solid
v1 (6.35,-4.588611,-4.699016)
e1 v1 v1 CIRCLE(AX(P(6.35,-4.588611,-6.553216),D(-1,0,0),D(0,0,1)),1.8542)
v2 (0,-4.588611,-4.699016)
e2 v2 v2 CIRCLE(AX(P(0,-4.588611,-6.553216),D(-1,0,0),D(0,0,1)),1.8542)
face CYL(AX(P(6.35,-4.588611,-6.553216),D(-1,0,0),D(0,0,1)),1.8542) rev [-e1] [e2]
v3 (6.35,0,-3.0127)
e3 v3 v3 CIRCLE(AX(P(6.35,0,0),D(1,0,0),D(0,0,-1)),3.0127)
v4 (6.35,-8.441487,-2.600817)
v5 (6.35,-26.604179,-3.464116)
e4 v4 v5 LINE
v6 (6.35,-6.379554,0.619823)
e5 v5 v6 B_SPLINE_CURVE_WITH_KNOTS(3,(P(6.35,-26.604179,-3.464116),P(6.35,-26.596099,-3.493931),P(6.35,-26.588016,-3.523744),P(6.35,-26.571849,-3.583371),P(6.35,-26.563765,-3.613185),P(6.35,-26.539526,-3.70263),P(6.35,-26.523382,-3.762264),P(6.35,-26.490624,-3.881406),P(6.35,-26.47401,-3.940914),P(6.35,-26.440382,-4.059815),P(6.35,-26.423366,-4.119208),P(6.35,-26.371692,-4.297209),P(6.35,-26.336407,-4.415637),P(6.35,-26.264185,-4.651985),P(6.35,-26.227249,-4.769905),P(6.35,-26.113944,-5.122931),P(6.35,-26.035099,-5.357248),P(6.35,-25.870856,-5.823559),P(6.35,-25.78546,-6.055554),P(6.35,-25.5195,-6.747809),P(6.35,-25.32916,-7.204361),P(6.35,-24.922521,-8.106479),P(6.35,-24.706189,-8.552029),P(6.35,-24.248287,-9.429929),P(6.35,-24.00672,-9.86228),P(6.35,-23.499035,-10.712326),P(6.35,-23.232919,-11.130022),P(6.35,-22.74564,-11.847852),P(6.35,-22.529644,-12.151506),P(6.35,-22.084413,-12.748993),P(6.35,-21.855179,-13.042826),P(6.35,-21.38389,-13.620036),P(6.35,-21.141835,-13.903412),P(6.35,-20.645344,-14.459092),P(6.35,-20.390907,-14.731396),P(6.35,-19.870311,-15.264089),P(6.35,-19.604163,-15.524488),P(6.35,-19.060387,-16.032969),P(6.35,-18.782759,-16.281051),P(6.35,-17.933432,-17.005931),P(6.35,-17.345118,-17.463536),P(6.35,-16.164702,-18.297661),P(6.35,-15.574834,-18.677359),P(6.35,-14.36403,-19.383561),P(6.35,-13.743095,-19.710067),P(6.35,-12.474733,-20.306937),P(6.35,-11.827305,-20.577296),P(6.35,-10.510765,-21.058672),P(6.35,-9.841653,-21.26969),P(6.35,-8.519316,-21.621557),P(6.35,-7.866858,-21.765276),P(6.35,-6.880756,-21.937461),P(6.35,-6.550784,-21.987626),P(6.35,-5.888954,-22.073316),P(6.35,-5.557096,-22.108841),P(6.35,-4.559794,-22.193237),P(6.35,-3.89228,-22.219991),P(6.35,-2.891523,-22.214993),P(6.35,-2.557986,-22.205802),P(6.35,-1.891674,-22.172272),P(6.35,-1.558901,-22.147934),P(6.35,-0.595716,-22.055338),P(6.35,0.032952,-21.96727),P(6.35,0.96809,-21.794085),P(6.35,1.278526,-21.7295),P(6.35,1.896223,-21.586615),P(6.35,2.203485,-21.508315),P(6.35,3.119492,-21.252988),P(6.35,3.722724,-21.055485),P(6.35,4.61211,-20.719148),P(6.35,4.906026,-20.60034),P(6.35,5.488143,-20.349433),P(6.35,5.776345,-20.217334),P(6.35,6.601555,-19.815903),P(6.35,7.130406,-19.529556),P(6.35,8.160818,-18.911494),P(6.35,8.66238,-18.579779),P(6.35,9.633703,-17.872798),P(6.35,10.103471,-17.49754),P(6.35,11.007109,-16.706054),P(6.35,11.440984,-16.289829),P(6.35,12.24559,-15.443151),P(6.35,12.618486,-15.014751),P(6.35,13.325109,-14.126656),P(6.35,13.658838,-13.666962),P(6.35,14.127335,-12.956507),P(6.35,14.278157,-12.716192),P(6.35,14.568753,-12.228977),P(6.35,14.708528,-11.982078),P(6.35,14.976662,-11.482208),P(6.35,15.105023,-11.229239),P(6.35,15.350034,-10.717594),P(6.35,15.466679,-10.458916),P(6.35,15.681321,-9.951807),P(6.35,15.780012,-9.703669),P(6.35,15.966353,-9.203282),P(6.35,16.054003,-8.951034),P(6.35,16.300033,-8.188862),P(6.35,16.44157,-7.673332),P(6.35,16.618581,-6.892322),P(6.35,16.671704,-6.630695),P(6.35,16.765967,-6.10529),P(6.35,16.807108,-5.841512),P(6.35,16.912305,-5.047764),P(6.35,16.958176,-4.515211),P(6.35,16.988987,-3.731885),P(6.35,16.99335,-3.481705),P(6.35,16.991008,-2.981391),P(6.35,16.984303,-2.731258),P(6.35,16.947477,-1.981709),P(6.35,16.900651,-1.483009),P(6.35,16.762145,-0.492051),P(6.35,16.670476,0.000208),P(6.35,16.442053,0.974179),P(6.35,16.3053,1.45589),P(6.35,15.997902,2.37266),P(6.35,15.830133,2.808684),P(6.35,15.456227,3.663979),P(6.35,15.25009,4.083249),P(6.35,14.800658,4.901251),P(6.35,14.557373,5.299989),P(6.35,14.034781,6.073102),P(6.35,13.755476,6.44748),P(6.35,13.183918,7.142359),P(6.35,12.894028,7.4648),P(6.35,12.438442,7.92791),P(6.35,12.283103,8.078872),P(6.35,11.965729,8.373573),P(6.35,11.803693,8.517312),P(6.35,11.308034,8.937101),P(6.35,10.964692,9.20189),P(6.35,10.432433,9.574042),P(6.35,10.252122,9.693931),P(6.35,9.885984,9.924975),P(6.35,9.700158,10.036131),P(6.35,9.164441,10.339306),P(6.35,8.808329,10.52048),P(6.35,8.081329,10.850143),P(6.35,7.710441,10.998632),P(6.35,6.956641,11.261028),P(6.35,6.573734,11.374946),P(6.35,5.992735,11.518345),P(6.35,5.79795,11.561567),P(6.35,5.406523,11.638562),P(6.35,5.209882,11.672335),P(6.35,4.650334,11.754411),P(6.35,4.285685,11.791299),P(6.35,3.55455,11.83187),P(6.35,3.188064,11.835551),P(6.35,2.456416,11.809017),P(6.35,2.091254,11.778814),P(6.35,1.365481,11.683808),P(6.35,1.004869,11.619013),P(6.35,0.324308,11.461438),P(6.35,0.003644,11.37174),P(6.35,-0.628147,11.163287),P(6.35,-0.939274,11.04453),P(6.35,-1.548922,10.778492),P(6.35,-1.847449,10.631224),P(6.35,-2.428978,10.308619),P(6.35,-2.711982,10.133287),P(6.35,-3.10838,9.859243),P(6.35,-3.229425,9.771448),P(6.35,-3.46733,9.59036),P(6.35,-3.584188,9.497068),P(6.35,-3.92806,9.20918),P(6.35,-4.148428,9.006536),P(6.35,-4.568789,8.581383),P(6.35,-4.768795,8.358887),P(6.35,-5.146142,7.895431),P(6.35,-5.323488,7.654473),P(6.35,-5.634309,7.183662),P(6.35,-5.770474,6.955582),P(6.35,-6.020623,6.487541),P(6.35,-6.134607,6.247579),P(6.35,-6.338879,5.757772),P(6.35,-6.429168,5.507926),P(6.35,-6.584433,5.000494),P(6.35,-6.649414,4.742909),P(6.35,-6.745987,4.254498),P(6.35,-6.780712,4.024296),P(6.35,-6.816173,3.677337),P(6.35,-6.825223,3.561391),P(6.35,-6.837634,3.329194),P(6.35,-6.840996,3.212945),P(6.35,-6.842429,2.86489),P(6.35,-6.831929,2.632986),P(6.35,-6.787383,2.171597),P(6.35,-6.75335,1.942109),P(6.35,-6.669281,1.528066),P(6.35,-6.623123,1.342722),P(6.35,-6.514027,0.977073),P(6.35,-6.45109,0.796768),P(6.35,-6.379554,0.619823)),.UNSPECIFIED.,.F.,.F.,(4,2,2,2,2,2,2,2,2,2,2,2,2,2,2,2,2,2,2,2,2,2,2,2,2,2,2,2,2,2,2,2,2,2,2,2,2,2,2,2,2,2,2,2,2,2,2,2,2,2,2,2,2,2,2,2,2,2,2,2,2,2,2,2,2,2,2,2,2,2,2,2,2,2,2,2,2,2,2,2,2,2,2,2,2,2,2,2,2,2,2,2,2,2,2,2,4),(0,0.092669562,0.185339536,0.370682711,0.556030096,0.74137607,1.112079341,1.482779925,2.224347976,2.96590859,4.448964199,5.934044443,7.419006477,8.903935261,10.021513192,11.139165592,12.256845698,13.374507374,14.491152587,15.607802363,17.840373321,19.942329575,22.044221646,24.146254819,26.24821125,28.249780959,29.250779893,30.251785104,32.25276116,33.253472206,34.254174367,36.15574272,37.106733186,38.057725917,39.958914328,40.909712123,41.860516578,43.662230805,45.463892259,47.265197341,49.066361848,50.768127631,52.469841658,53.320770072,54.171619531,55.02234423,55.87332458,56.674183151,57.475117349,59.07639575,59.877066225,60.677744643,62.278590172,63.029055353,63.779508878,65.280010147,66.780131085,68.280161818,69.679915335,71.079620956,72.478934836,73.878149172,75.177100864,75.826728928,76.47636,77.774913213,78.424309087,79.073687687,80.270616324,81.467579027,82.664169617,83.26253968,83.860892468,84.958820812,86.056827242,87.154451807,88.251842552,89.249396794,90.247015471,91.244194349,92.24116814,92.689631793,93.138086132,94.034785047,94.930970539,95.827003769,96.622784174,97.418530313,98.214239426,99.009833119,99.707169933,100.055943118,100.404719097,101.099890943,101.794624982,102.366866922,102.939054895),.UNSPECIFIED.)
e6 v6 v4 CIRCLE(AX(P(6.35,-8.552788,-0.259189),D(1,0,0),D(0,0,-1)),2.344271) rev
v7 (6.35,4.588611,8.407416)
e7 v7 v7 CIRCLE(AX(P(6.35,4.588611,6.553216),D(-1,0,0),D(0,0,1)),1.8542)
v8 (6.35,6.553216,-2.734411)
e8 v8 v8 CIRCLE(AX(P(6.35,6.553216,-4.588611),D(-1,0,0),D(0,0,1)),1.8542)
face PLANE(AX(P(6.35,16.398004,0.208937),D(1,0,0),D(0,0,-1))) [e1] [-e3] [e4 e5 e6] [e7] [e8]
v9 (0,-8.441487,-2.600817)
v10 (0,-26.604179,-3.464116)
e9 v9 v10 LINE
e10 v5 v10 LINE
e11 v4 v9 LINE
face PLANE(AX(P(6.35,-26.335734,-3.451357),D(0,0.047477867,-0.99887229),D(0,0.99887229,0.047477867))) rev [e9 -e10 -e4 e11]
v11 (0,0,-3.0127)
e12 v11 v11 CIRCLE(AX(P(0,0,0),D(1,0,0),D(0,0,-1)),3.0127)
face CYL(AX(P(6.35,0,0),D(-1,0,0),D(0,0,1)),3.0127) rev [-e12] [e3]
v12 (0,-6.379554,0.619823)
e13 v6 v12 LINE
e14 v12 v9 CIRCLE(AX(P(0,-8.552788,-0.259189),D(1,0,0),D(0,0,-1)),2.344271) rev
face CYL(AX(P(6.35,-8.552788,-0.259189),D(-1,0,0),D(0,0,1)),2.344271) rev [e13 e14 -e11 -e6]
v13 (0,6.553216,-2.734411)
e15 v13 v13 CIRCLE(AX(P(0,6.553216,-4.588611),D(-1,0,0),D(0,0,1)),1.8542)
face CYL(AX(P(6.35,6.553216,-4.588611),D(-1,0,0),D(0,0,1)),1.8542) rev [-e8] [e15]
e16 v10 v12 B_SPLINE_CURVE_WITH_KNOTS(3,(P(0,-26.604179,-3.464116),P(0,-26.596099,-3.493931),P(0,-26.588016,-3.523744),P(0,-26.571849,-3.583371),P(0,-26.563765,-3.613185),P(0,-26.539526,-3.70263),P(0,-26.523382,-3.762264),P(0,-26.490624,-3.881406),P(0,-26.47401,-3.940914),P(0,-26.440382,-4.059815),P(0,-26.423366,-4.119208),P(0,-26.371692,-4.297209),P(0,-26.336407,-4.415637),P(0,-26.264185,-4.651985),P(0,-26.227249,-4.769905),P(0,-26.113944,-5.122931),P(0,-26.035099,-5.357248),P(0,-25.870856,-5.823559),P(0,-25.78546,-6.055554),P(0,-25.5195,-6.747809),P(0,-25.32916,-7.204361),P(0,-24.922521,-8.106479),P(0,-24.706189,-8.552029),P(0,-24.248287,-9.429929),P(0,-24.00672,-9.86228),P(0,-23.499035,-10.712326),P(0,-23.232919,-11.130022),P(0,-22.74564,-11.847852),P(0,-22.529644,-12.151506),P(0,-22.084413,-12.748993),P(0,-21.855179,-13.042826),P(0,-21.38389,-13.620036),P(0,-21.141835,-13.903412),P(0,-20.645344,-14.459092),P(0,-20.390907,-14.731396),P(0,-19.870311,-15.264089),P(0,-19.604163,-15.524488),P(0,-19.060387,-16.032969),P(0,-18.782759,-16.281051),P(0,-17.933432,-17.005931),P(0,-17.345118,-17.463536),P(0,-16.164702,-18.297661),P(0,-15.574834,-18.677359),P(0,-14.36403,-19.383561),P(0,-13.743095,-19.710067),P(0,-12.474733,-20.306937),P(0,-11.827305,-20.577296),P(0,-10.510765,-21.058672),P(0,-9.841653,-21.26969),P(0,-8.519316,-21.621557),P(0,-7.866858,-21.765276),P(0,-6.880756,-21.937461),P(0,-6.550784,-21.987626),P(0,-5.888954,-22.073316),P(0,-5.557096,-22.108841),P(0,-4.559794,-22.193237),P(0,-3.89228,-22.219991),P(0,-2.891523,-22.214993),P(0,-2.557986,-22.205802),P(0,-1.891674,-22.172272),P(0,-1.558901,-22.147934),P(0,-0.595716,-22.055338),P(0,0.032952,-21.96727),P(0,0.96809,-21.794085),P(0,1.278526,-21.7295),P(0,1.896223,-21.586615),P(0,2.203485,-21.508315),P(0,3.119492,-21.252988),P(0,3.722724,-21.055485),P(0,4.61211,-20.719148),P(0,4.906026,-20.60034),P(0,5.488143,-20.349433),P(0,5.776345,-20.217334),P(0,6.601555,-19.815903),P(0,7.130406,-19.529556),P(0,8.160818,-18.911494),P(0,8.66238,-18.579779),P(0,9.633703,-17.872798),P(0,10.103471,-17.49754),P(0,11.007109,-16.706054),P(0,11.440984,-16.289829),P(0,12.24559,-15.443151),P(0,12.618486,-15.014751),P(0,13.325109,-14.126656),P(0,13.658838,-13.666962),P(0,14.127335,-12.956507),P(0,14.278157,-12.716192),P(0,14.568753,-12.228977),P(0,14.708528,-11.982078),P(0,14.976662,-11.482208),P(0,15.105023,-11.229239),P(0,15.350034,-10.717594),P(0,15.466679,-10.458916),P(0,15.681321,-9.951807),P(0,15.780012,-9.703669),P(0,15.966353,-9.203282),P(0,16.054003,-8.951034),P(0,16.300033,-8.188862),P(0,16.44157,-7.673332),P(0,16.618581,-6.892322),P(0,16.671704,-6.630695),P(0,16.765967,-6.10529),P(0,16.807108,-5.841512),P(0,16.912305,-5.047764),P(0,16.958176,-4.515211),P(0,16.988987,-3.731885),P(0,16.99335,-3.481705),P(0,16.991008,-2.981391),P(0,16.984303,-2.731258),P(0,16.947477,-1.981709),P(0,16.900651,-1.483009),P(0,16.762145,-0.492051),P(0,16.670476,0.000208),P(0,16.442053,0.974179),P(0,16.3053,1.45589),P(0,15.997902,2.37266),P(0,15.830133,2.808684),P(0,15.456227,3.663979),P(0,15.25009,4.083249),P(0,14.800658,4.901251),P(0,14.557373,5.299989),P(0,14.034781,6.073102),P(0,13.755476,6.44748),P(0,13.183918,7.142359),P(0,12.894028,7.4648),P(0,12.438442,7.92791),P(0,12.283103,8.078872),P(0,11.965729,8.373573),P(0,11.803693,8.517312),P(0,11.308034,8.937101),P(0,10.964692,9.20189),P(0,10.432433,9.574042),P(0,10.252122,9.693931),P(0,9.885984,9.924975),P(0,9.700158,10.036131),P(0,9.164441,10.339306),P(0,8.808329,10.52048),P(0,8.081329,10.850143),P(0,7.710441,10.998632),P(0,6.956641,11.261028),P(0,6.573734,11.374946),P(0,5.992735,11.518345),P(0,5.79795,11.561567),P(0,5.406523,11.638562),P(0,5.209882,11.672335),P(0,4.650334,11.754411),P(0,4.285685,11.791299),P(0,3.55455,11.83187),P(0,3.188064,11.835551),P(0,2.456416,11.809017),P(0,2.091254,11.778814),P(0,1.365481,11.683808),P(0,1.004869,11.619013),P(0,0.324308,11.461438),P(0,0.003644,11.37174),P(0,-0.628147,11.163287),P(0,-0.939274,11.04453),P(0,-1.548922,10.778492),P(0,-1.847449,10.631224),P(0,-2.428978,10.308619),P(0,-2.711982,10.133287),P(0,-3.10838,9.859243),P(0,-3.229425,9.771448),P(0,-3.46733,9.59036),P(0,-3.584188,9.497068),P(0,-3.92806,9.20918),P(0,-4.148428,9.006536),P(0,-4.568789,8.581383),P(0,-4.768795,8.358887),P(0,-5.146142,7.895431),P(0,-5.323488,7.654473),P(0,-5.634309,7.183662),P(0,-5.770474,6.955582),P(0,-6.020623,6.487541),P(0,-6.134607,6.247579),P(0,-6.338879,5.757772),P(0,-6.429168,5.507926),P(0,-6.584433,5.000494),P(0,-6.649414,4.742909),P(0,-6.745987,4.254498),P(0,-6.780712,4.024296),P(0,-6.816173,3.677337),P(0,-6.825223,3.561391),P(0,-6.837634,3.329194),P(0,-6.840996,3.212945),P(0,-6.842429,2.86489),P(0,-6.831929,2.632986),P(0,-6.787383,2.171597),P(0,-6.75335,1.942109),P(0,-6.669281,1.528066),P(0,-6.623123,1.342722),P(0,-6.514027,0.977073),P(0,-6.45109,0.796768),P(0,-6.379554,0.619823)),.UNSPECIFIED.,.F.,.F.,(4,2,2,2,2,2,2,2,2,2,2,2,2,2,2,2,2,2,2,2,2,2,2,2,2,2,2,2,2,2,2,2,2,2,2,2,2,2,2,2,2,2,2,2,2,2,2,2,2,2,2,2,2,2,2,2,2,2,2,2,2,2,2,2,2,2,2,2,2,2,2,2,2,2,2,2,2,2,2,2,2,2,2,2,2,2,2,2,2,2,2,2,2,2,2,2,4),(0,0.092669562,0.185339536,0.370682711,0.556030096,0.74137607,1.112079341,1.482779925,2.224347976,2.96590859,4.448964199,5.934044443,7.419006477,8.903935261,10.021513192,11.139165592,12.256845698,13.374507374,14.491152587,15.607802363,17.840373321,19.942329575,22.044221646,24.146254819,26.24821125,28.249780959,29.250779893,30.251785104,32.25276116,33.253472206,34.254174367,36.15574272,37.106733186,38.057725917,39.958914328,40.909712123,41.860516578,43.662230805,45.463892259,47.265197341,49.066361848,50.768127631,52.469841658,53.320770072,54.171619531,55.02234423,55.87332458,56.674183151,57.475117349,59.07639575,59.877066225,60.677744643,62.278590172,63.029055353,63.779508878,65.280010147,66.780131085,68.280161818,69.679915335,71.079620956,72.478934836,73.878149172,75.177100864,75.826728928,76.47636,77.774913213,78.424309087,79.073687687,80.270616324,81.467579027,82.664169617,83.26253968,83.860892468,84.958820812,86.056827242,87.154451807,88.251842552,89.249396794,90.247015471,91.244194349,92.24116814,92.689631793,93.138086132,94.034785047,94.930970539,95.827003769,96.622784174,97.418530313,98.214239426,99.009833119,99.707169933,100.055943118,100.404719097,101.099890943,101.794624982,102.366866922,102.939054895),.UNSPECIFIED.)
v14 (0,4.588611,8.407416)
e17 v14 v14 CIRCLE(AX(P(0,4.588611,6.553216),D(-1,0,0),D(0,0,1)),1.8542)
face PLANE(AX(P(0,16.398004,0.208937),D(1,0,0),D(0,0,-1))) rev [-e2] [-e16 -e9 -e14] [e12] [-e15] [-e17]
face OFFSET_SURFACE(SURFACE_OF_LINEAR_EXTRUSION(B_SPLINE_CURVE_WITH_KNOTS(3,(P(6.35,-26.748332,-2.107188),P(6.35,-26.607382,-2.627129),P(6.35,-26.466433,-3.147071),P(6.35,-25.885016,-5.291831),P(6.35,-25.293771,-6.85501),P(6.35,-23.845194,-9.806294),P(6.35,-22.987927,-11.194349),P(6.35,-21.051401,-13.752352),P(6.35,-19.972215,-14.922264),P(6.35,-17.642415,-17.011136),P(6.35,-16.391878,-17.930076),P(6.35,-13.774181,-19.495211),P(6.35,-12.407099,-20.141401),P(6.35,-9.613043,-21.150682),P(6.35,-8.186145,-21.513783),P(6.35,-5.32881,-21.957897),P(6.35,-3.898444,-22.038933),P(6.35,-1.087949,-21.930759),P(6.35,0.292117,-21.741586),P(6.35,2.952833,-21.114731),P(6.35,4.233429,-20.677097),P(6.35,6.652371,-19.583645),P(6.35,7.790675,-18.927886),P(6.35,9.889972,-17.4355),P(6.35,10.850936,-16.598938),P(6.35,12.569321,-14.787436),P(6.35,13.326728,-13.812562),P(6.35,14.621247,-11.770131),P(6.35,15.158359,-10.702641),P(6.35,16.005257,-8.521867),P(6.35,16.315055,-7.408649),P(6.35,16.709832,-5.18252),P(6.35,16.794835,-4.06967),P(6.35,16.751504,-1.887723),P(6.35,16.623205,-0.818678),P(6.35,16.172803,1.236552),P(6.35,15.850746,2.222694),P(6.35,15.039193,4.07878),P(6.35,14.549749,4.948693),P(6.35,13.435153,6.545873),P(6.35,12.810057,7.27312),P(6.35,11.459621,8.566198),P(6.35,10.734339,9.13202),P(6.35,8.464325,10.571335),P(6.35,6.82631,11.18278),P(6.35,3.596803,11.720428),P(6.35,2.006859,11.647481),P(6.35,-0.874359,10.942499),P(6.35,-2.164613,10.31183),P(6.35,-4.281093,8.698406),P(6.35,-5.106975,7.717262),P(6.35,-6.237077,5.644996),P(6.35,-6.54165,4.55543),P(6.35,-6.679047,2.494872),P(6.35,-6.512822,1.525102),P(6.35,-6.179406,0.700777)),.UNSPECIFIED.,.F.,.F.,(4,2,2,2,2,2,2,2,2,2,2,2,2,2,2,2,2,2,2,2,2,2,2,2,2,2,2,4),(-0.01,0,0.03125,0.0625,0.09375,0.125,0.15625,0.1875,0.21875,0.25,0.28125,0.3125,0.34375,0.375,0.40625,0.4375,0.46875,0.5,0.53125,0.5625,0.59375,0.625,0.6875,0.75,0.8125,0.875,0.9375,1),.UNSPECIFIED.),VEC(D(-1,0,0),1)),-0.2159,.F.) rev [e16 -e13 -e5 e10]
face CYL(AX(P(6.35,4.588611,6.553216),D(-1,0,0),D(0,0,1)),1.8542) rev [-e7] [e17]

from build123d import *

# Parameters (mm, degrees)
SKETCH4_R           = 3.012699969
BOSS_EXTRUDE1_DEPTH = 6.35
MOVE_FACE1_DEPTH    = 6.35
SKETCH11_R          = 1.8542
CUT_EXTRUDE2_DEPTH  = 36.237722546


# Read off the part's stored shape, not the designer's step: Move Face1
with BuildPart() as part:
    # Sketch4 → Boss-Extrude1 (new body)
    with BuildSketch(Plane(origin=(0, 0, 0), x_dir=(0, 0, -1), z_dir=(1, 0, 0))):
        with BuildLine():
            Line((3.667013126, -26.3254835), (2.816473307, -8.431236894))
            ThreePointArc((2.816473307, -8.431236894), (1.639602622, -6.396649217), (-0.700777066, -6.179406175))
            add(Edge.make_bspline(
                [(-0.700777066, -6.179406175), (-1.525102008, -6.512822326), (-2.494871997, -6.679047096), (-4.555429578, -6.54165034), (-5.644996058, -6.237076936), (-7.717261628, -5.106975392), (-8.698405735, -4.281093265), (-10.311829803, -2.164612563), (-10.942499326, -0.874358563), (-11.647480976, 2.006859472), (-11.720427957, 3.596803483), (-11.182779689, 6.826310345), (-10.571334953, 8.46432492), (-9.132019695, 10.73433891), (-8.566197708, 11.459621106), (-7.273120414, 12.810057002), (-6.545872807, 13.435152517), (-4.948692799, 14.549748502), (-4.078780417, 15.039192621), (-2.22269385, 15.85074605), (-1.236551533, 16.172803424), (0.818678144, 16.623204755), (1.887722789, 16.751503646), (4.069669804, 16.79483508), (5.182520117, 16.709831654), (7.408648574, 16.315055224), (8.521867273, 16.00525724), (10.70264063, 15.158359498), (11.770130786, 14.621247223), (13.812561896, 13.326727542), (14.787435905, 12.56932106), (16.598938448, 10.850935673), (17.435500393, 9.889971566), (18.927885533, 7.790674993), (19.583645356, 6.652371052), (20.677096627, 4.233429246), (21.114730733, 2.952832896), (21.741586229, 0.292117033), (21.930758945, -1.087949282), (22.038932986, -3.898444365), (21.957896657, -5.328810088), (21.513783431, -8.186144708), (21.150681858, -9.613043017), (20.141400668, -12.407098951), (19.49521083, -13.774181132), (17.930076055, -16.391877744), (17.011136269, -17.642414844), (14.922264044, -19.972214517), (13.752352434, -21.051401006), (11.194349378, -22.98792657), (9.80629411, -23.845193985), (6.855009859, -25.29377098), (5.291831431, -25.88501641), (3.667013126, -26.3254835)],
                knots=[0, 0, 0, 0, 0.0625, 0.0625, 0.125, 0.125, 0.1875, 0.1875, 0.25, 0.25, 0.3125, 0.3125, 0.375, 0.375, 0.40625, 0.40625, 0.4375, 0.4375, 0.46875, 0.46875, 0.5, 0.5, 0.53125, 0.53125, 0.5625, 0.5625, 0.59375, 0.59375, 0.625, 0.625, 0.65625, 0.65625, 0.6875, 0.6875, 0.71875, 0.71875, 0.75, 0.75, 0.78125, 0.78125, 0.8125, 0.8125, 0.84375, 0.84375, 0.875, 0.875, 0.90625, 0.90625, 0.9375, 0.9375, 0.96875, 0.96875, 1, 1, 1, 1], degree=3))
        make_face()
        Circle(SKETCH4_R, mode=Mode.SUBTRACT)
    extrude(amount=BOSS_EXTRUDE1_DEPTH)

    # Move Face1 outline → Move Face1 (add)
    with BuildSketch(Plane.YZ):
        with BuildLine():
            Line((-8.441487365, -2.600816779), (-26.604178645, -3.464116168))
            add(Edge.make_bspline(
                [(-26.604178645, -3.464116168), (-26.599569003, -3.481120458), (-26.594959362, -3.498124748), (-26.59034972, -3.515129038), (-26.585740078, -3.532133328), (-26.581130437, -3.549137618), (-26.576520795, -3.566141908), (-26.571911153, -3.583146198), (-26.567301512, -3.600150488), (-26.56269187, -3.617154778), (-26.558082228, -3.634159068), (-26.553472587, -3.651163358), (-26.548862945, -3.668167648), (-26.544253303, -3.685171938), (-26.53927128, -3.703549889), (-26.538898899, -3.704923549), (-26.538526517, -3.70629721), (-26.538154136, -3.707670871), (-26.537781754, -3.709044531), (-26.537409373, -3.710418192), (-26.537036991, -3.711791852), (-26.53666461, -3.713165513), (-26.536292228, -3.714539173), (-26.535919847, -3.715912834), (-26.535547465, -3.717286495), (-26.535175084, -3.718660155), (-26.534802702, -3.720033816), (-26.53424413, -3.722094307), (-26.534059907, -3.722773916), (-26.533858021, -3.723518442), (-26.533727067, -3.724001851), (-26.533440048, -3.725060798), (-26.533340537, -3.725426825), (-26.533133021, -3.726192717), (-26.532893488, -3.727076218), (-26.532782162, -3.727485594), (-26.532537582, -3.728388165), (-26.532375797, -3.728983938), (-26.532180677, -3.729703197), (-26.531993743, -3.730392017), (-26.531617908, -3.731776793), (-26.531429971, -3.732469173), (-26.531242014, -3.733161545), (-26.531054038, -3.733853909), (-26.530866042, -3.734546265), (-26.530678027, -3.735238614), (-26.530489992, -3.735930954), (-26.530301938, -3.736623286), (-26.530113864, -3.73731561), (-26.529925771, -3.738007927), (-26.529737659, -3.738700235), (-26.529549527, -3.739392535), (-26.529361375, -3.740084828), (-26.528420519, -3.74354625), (-26.527667523, -3.74631526), (-26.526914215, -3.749084142), (-26.526160594, -3.751852897), (-26.525406663, -3.754621524), (-26.524652417, -3.757390023), (-26.523897864, -3.760158394), (-26.523142994, -3.762926638), (-26.522387816, -3.765694753), (-26.521632324, -3.768462741), (-26.520876522, -3.7712306), (-26.520120408, -3.773998332), (-26.519363982, -3.776765936), (-26.517093769, -3.785068362), (-26.515579047, -3.790602801), (-26.514063078, -3.796136728), (-26.512545864, -3.801670141), (-26.511027403, -3.807203041), (-26.509507697, -3.812735429), (-26.507986745, -3.818267302), (-26.506464548, -3.823798661), (-26.504941106, -3.829329506), (-26.503416418, -3.834859837), (-26.501890486, -3.840389653), (-26.500363309, -3.845918954), (-26.498834888, -3.85144774), (-26.494245891, -3.868032549), (-26.491181583, -3.879087027), (-26.488112299, -3.890139439), (-26.485038042, -3.901189785), (-26.481958812, -3.912238061), (-26.478874612, -3.923284266), (-26.475785441, -3.934328398), (-26.472691304, -3.945370453), (-26.4695922, -3.956410431), (-26.466488131, -3.967448328), (-26.463379099, -3.978484142), (-26.460265106, -3.989517871), (-26.457146153, -4.000549514), (-26.441526593, -4.055697279), (-26.428951609, -4.099782062), (-26.416297387, -4.143833272), (-26.403564026, -4.187850766), (-26.390751622, -4.2318344), (-26.377860278, -4.275784033), (-26.364890086, -4.31969952), (-26.351841151, -4.363580717), (-26.338713566, -4.407427483), (-26.325507433, -4.451239673), (-26.312222848, -4.495017144), (-26.298859911, -4.538759754), (-26.285418719, -4.582467358), (-26.217821979, -4.800829638), (-26.162494118, -4.974957082), (-26.105922065, -5.148512984), (-26.048112096, -5.321488181), (-25.989070491, -5.49387351), (-25.928803524, -5.665659807), (-25.867317478, -5.836837911), (-25.804618624, -6.007398657), (-25.740713246, -6.177332884), (-25.675607616, -6.346631428), (-25.609308015, -6.515285126), (-25.541820718, -6.683284815), (-25.473152005, -6.850621333), (-25.263620445, -7.350613883), (-25.119234857, -7.681244245), (-24.970181526, -8.009184855), (-24.816563128, -8.334008567), (-24.658405438, -8.656540908), (-24.495574442, -8.975326705), (-24.328540305, -9.291435032), (-24.157090549, -9.604622916), (-23.981161893, -9.914157206), (-23.801250109, -10.220890306), (-23.616969066, -10.524098117), (-23.428657045, -10.824036045), (-23.23626742, -11.120542818), (-22.843508974, -11.706612059), (-22.643142176, -11.996174333), (-22.438808393, -12.282198027), (-22.230723583, -12.56460565), (-22.018648797, -12.843459923), (-21.802917467, -13.118447754), (-21.583605212, -13.389644606), (-21.360601243, -13.657176078), (-21.134077845, -13.920797741), (-20.904199437, -14.180403567), (-20.670850853, -14.43621903), (-20.434249131, -14.687936687), (-20.194399706, -14.935644556), (-19.70838235, -15.42287054), (-19.462215458, -15.662397811), (-19.212931723, -15.897766285), (-18.960728671, -16.128991264), (-18.70539447, -16.355994955), (-18.447304202, -16.578625492), (-18.186499944, -16.796967202), (-17.922857209, -17.011060359), (-17.656599224, -17.220738444), (-17.387896766, -17.42596103), (-17.116588056, -17.626860373), (-16.842954408, -17.82323191), (-16.566974945, -18.015139117), (-16.010532784, -18.389907039), (-15.730066911, -18.572777232), (-15.447424653, -18.751061226), (-15.162746667, -18.924851219), (-14.875916093, -19.093949929), (-14.587276398, -19.258367365), (-14.296840097, -19.418183126), (-14.004513923, -19.573354608), (-13.710535007, -19.723805382), (-13.415054471, -19.869556513), (-13.117916757, -20.010637113), (-12.819417073, -20.146961011), (-12.519527346, -20.278558541), (-11.917189037, -20.532242336), (-11.614733643, -20.65433651), (-11.311086848, -20.771622769), (-11.006314451, -20.884236095), (-10.700430715, -20.991914806), (-10.39369458, -21.094796517), (-10.086097937, -21.192946197), (-9.777608438, -21.286263743), (-9.468444303, -21.374756831), (-9.158720169, -21.458492374), (-8.848328151, -21.537414262), (-8.537533287, -21.611545146), (-8.226317575, -21.68088471), (-7.603260387, -21.809981168), (-7.291409675, -21.869743076), (-6.979352707, -21.924681004), (-6.667077965, -21.974937355), (-6.354741362, -22.020247701), (-6.042483137, -22.060828702), (-5.730286129, -22.096726163), (-5.418195248, -22.127815836), (-5.10638259, -22.154172495), (-4.794917194, -22.175889882), (-4.483768614, -22.19285834), (-4.173135796, -22.205184806), (-3.863025065, -22.212847752), (-3.244042, -22.218898546), (-2.935160635, -22.217283683), (-2.627009812, -22.211051294), (-2.319535889, -22.200221076), (-2.012978585, -22.184764162), (-1.707390049, -22.164745089), (-1.402745405, -22.140231054), (-1.099140461, -22.111224435), (-0.796711927, -22.077727229), (-0.495491172, -22.03980106), (-0.195495425, -21.997498698), (0.103120125, -21.950796576), (0.400341286, -21.899765548), (0.991819558, -21.789077387), (1.28608355, -21.729419077), (1.578768432, -21.665496674), (1.869917455, -21.597302553), (2.159298453, -21.524877058), (2.446882891, -21.44828864), (2.732707168, -21.367584679), (3.016672969, -21.282790594), (3.298648908, -21.193943649), (3.578623787, -21.101102717), (3.85659217, -21.004314712), (4.132391722, -20.903599993), (4.406031128, -20.799020335), (4.948821205, -20.582201458), (5.217977174, -20.469959264), (5.484813738, -20.353954278), (5.749350964, -20.234161295), (6.01138819, -20.110681465), (6.270917632, -19.983580155), (6.527976619, -19.852885482), (6.782472092, -19.718646938), (7.034289441, -19.580933449), (7.283432367, -19.43979613), (7.529901875, -19.295274808), (7.77354503, -19.147434253), (8.014385292, -18.996321733), (8.490309508, -18.687660003), (8.725396651, -18.530106846), (8.957555599, -18.369412167), (9.186776625, -18.205547192), (9.412909718, -18.038656901), (9.635962414, -17.868799381), (9.855964095, -17.695988596), (10.072835585, -17.520295455), (10.286488685, -17.341812823), (10.496935081, -17.160582706), (10.704177349, -16.976639307), (10.908088748, -16.790084702), (11.108697582, -16.60095136), (11.503188846, -16.217665056), (11.697072069, -16.023508272), (11.887567215, -15.826919792), (12.074634411, -15.627883555), (12.258185431, -15.42656542), (12.438237852, -15.223014525), (12.614807781, -15.017239038), (12.787836646, -14.809325702), (12.957268738, -14.599380603), (13.123118176, -14.387438261), (13.285386007, -14.173530705), (13.443983714, -13.9577844), (13.598936774, -13.740220791), (13.901469825, -13.301617581), (14.049048428, -13.080575457), (14.192938252, -12.85786673), (14.333075884, -12.633504041), (14.469436513, -12.407648424), (14.602043246, -12.180340569), (14.730898025, -11.951592848), (14.855967044, -11.721500116), (14.977228845, -11.490169384), (15.094696526, -11.257631481), (15.208368824, -11.023920803), (15.318201343, -10.789171515), (15.424212302, -10.553400689), (15.62854924, -10.079983096), (15.726872378, -9.842336108), (15.821368333, -9.603809457), (15.911963677, -9.364456828), (15.998688398, -9.124410274), (16.081568069, -8.883704025), (16.160594519, -8.642364015), (16.235759672, -8.400484565), (16.307073362, -8.15816166), (16.374546973, -7.915427103), (16.438178826, -7.672322007), (16.497967314, -7.428970727), (16.553923089, -7.185393613), (16.658169192, -6.697950384), (16.706458163, -6.454088263), (16.750931294, -6.210116308), (16.791551227, -5.966156004), (16.828352164, -5.722265003), (16.861371473, -5.478483856), (16.89061727, -5.234873215), (16.916091026, -4.991505669), (16.937812625, -4.748444975), (16.955811803, -4.505744551), (16.970101403, -4.263463823), (16.98068149, -4.021672476), (16.987586075, -3.780425869), (16.994060031, -3.299148156), (16.993631026, -3.059123221), (16.989555385, -2.819737011), (16.981828074, -2.581119041), (16.97049256, -2.343310945), (16.955590155, -2.106340667), (16.937140606, -1.870268338), (16.91516095, -1.635166239), (16.889682937, -1.401088709), (16.860744509, -1.168076804), (16.828369507, -0.936186685), (16.792572797, -0.705489655), (16.753396921, -0.476025059), (16.668327332, -0.019684131), (16.622436928, 0.207187985), (16.573210516, 0.43274012), (16.520676595, 0.656845924), (16.464882551, 0.879479604), (16.405870334, 1.100624284), (16.3436718, 1.320223268), (16.278319602, 1.538208936), (16.209854217, 1.754538123), (16.138317988, 1.969182142), (16.063745228, 2.182090339), (15.986166539, 2.393194111), (15.905627626, 2.602469813), (15.738694717, 3.017250287), (15.652304686, 3.222753348), (15.563011722, 3.426348397), (15.470874943, 3.627923175), (15.375941264, 3.827466031), (15.27825116, 4.024968988), (15.177848129, 4.22038201), (15.074779017, 4.413646484), (14.969089842, 4.604731213), (14.860824208, 4.793618869), (14.750025822, 4.980266585), (14.6367404, 5.164613119), (14.521012434, 5.346648599), (14.284759964, 5.705997611), (14.164238936, 5.88331198), (14.041346931, 6.058244698), (13.916166576, 6.230707349), (13.788741729, 6.400699169), (13.659110682, 6.568218603), (13.527326668, 6.733225876), (13.393447683, 6.895675454), (13.257522548, 7.055547765), (13.11959423, 7.212834846), (12.979713874, 7.367503996), (12.837939646, 7.519506253), (12.694312503, 7.668841812), (12.403459758, 7.962101433), (12.256236093, 8.106028416), (12.107245062, 8.247230378), (11.956582639, 8.385649016), (11.804288588, 8.521291455), (11.65039943, 8.654160681), (11.494975113, 8.78422985), (11.338080513, 8.911469301), (11.179764974, 9.035870418), (11.020069941, 9.157432821), (10.859051406, 9.276135657), (10.696775757, 9.391945779), (10.53327979, 9.504870215), (10.348041361, 9.62863484), (10.327440973, 9.642341074), (10.306822731, 9.656001739), (10.286186731, 9.669616814), (10.265532905, 9.683186339), (10.244861188, 9.696710349), (10.224171615, 9.710188832), (10.203464367, 9.723621723), (10.182739741, 9.737008906), (10.161998068, 9.750350261), (10.141239561, 9.763645725), (10.12046411, 9.776895389), (10.099671, 9.79009961), (10.058046161, 9.81641871), (10.037217098, 9.829531834), (10.016371494, 9.842598537), (9.995509453, 9.855618821), (9.974631077, 9.868592692), (9.953736471, 9.881520152), (9.932825737, 9.894401206), (9.911898978, 9.907235857), (9.890956298, 9.920024109), (9.869997801, 9.932765967), (9.849023589, 9.945461434), (9.828033765, 9.958110514), (9.807028434, 9.97071321), (9.743966224, 10.00838216), (9.701863133, 10.033309276), (9.659699249, 10.058050905), (9.617475395, 10.082607077), (9.575192397, 10.106977826), (9.532851077, 10.131163181), (9.490452261, 10.155163174), (9.447996771, 10.178977836), (9.405485434, 10.202607198), (9.362919072, 10.226051291), (9.320298511, 10.249310147), (9.277624573, 10.272383796), (9.234898083, 10.29527227), (9.106563432, 10.363382261), (9.020800116, 10.408048353), (8.934836483, 10.451974125), (8.848679096, 10.495159823), (8.762334519, 10.537605698), (8.675809318, 10.579311995), (8.589110055, 10.620278965), (8.502243296, 10.660506853), (8.415215603, 10.699995909), (8.328033542, 10.73874638), (8.240703676, 10.776758515), (8.15323257, 10.814032561), (8.065626787, 10.850568766), (7.802425101, 10.957964605), (7.626444742, 11.026611369), (7.450004147, 11.092309662), (7.27315561, 11.155061426), (7.095951384, 11.214868552), (6.918443686, 11.271732888), (6.740684687, 11.325656229), (6.562726523, 11.376640328), (6.384621288, 11.424686885), (6.206421038, 11.469797554), (6.028177787, 11.511973941), (5.84994351, 11.551217606), (5.671770144, 11.587530057), (5.315649022, 11.654295458), (5.137728602, 11.684747226), (4.959700016, 11.712299475), (4.783019884, 11.736712222), (4.604276011, 11.758891306), (4.429464411, 11.777036031), (4.250811556, 11.793890793), (4.076436597, 11.806370641), (3.899761626, 11.817263639), (3.725133165, 11.824666119), (3.550410334, 11.829638498), (3.37648165, 11.831780195), (3.203155326, 11.831236863), (2.857881444, 11.824777298), (2.685930065, 11.818863209), (2.51470827, 11.810286856), (2.344260063, 11.799070213), (2.174629427, 11.785235191), (2.005860324, 11.768803637), (1.837996698, 11.749797331), (1.671082472, 11.728237989), (1.50516155, 11.704147262), (1.340277816, 11.677546737), (1.176475132, 11.648457935), (1.013797343, 11.616902313), (0.852288272, 11.582901263), (0.61184345, 11.528263534), (0.53200571, 11.509447542), (0.452431498, 11.490014724), (0.373262519, 11.470000825), (0.294382178, 11.449393041), (0.215797381, 11.428191413), (0.137577788, 11.406409742), (0.059709652, 11.384053465), (-0.017850954, 11.361120913), (-0.095072103, 11.33761765), (-0.171912733, 11.313553202), (-0.248433789, 11.288926884), (-0.324588602, 11.263745774), (-0.476187787, 11.21228181), (-0.551629997, 11.185999058), (-0.626711201, 11.159170067), (-0.701427774, 11.131799368), (-0.775776089, 11.103891494), (-0.849752523, 11.075450975), (-0.92335345, 11.046482344), (-0.996575245, 11.016990131), (-1.069414282, 10.986978867), (-1.141866938, 10.956453085), (-1.213929586, 10.925417316), (-1.285598602, 10.89387609), (-1.35687036, 10.86183394), (-1.569482988, 10.764218312), (-1.709621229, 10.697155476), (-1.848127108, 10.628143005), (-1.98497177, 10.557216936), (-2.120126347, 10.484413233), (-2.253561967, 10.409767786), (-2.385249746, 10.333316406), (-2.515160795, 10.255094835), (-2.643266216, 10.175138734), (-2.769537102, 10.093483694), (-2.893944539, 10.010165228), (-3.016459604, 9.925218776), (-3.137053367, 9.838679702), (-3.315018649, 9.706535092), (-3.373849905, 9.662101445), (-3.432225085, 9.617246491), (-3.489973308, 9.572127532), (-3.547384771, 9.52651408), (-3.604222119, 9.480589049), (-3.660493818, 9.43435795), (-3.716362737, 9.387700649), (-3.771715305, 9.340702599), (-3.826473613, 9.293429538), (-3.880830859, 9.245743042), (-3.934616774, 9.197770987), (-3.987913252, 9.149459099), (-4.093478067, 9.052199488), (-4.145749357, 9.003249721), (-4.19750826, 8.953985292), (-4.248753506, 8.904411497), (-4.299483825, 8.854533635), (-4.349697947, 8.804357003), (-4.399394603, 8.753886901), (-4.448572522, 8.703128624), (-4.497230434, 8.652087473), (-4.545367069, 8.600768744), (-4.592981158, 8.549177736), (-4.640071431, 8.497319746), (-4.686636617, 8.445200073), (-4.824753105, 8.288071896), (-4.914725275, 8.182294046), (-5.002581891, 8.075532644), (-5.088312844, 7.967829797), (-5.171907984, 7.859227538), (-5.253357116, 7.749767825), (-5.332650002, 7.639492543), (-5.409776362, 7.528443501), (-5.48472587, 7.416662437), (-5.55748816, 7.304191013), (-5.628052821, 7.191070818), (-5.696409398, 7.077343365), (-5.762547394, 6.963050096), (-5.890365144, 6.733414655), (-5.952053709, 6.61804774), (-6.011379226, 6.5024593), (-6.068789532, 6.385932229), (-6.123482319, 6.2698429), (-6.176476599, 6.152615371), (-6.226996856, 6.035513752), (-6.275228474, 5.918322644), (-6.321621575, 5.800380212), (-6.365473581, 5.682832438), (-6.407390636, 5.564799764), (-6.447052072, 5.446825396), (-6.484587524, 5.328765169), (-6.55536853, 5.092635858), (-6.588616961, 4.974562342), (-6.619731944, 4.856519728), (-6.64872202, 4.73854772), (-6.675595644, 4.620685966), (-6.700361191, 4.50297406), (-6.723026952, 4.385451536), (-6.743601132, 4.268157874), (-6.762091856, 4.151132495), (-6.778507164, 4.034414767), (-6.792855012, 3.918043998), (-6.805143275, 3.802059442), (-6.815379741, 3.686500296), (-6.839956872, 3.341216503), (-6.848154204, 3.113073347), (-6.848438469, 2.887099769), (-6.84084938, 2.663718746), (-6.825763132, 2.443005573), (-6.803253008, 2.225285636), (-6.773501282, 2.01082461), (-6.73678547, 1.799796855), (-6.69324338, 1.592468222), (-6.643018498, 1.389115017), (-6.586393416, 1.18991247), (-6.52346955, 0.995146747), (-6.454467342, 0.805035191), (-6.379554183, 0.619822851)],
                knots=[-0.001662915, -0.001662915, -0.001662915, -0.001662915, -0.001662915, -0.001662915, -0.001662915, -0.001662915, -0.001662915, -0.001662915, -0.001662915, -0.001662915, -0.001662915, -0.001662915, -0.001662915, -0.000136719, -0.000136719, -0.000136719, -0.000136719, -0.000136719, -0.000136719, -0.000136719, -0.000136719, -0.000136719, -0.000136719, -0.000136719, -0.000136719, -0.000136719, -1.3428e-05, -1.3428e-05, -1.3428e-05, -1.3428e-05, -1.3428e-05, -1.3428e-05, -1.3428e-05, -1.3428e-05, -1.3428e-05, -1.3428e-05, -1.3428e-05, -1.3428e-05, -1.3428e-05, 4.8218e-05, 4.8218e-05, 4.8218e-05, 4.8218e-05, 4.8218e-05, 4.8218e-05, 4.8218e-05, 4.8218e-05, 4.8218e-05, 4.8218e-05, 4.8218e-05, 4.8218e-05, 4.8218e-05, 0.000109863, 0.000109863, 0.000109863, 0.000109863, 0.000109863, 0.000109863, 0.000109863, 0.000109863, 0.000109863, 0.000109863, 0.000109863, 0.000109863, 0.000109863, 0.000356445, 0.000356445, 0.000356445, 0.000356445, 0.000356445, 0.000356445, 0.000356445, 0.000356445, 0.000356445, 0.000356445, 0.000356445, 0.000356445, 0.000356445, 0.000849609, 0.000849609, 0.000849609, 0.000849609, 0.000849609, 0.000849609, 0.000849609, 0.000849609, 0.000849609, 0.000849609, 0.000849609, 0.000849609, 0.000849609, 0.001835937, 0.001835937, 0.001835937, 0.001835937, 0.001835937, 0.001835937, 0.001835937, 0.001835937, 0.001835937, 0.001835937, 0.001835937, 0.001835937, 0.001835937, 0.00578125, 0.00578125, 0.00578125, 0.00578125, 0.00578125, 0.00578125, 0.00578125, 0.00578125, 0.00578125, 0.00578125, 0.00578125, 0.00578125, 0.00578125, 0.0215625, 0.0215625, 0.0215625, 0.0215625, 0.0215625, 0.0215625, 0.0215625, 0.0215625, 0.0215625, 0.0215625, 0.0215625, 0.0215625, 0.0215625, 0.053125, 0.053125, 0.053125, 0.053125, 0.053125, 0.053125, 0.053125, 0.053125, 0.053125, 0.053125, 0.053125, 0.053125, 0.053125, 0.0846875, 0.0846875, 0.0846875, 0.0846875, 0.0846875, 0.0846875, 0.0846875, 0.0846875, 0.0846875, 0.0846875, 0.0846875, 0.0846875, 0.0846875, 0.11625, 0.11625, 0.11625, 0.11625, 0.11625, 0.11625, 0.11625, 0.11625, 0.11625, 0.11625, 0.11625, 0.11625, 0.11625, 0.1478125, 0.1478125, 0.1478125, 0.1478125, 0.1478125, 0.1478125, 0.1478125, 0.1478125, 0.1478125, 0.1478125, 0.1478125, 0.1478125, 0.1478125, 0.179375, 0.179375, 0.179375, 0.179375, 0.179375, 0.179375, 0.179375, 0.179375, 0.179375, 0.179375, 0.179375, 0.179375, 0.179375, 0.2109375, 0.2109375, 0.2109375, 0.2109375, 0.2109375, 0.2109375, 0.2109375, 0.2109375, 0.2109375, 0.2109375, 0.2109375, 0.2109375, 0.2109375, 0.2425, 0.2425, 0.2425, 0.2425, 0.2425, 0.2425, 0.2425, 0.2425, 0.2425, 0.2425, 0.2425, 0.2425, 0.2425, 0.2740625, 0.2740625, 0.2740625, 0.2740625, 0.2740625, 0.2740625, 0.2740625, 0.2740625, 0.2740625, 0.2740625, 0.2740625, 0.2740625, 0.2740625, 0.305625, 0.305625, 0.305625, 0.305625, 0.305625, 0.305625, 0.305625, 0.305625, 0.305625, 0.305625, 0.305625, 0.305625, 0.305625, 0.3371875, 0.3371875, 0.3371875, 0.3371875, 0.3371875, 0.3371875, 0.3371875, 0.3371875, 0.3371875, 0.3371875, 0.3371875, 0.3371875, 0.3371875, 0.36875, 0.36875, 0.36875, 0.36875, 0.36875, 0.36875, 0.36875, 0.36875, 0.36875, 0.36875, 0.36875, 0.36875, 0.36875, 0.4003125, 0.4003125, 0.4003125, 0.4003125, 0.4003125, 0.4003125, 0.4003125, 0.4003125, 0.4003125, 0.4003125, 0.4003125, 0.4003125, 0.4003125, 0.431875, 0.431875, 0.431875, 0.431875, 0.431875, 0.431875, 0.431875, 0.431875, 0.431875, 0.431875, 0.431875, 0.431875, 0.431875, 0.4634375, 0.4634375, 0.4634375, 0.4634375, 0.4634375, 0.4634375, 0.4634375, 0.4634375, 0.4634375, 0.4634375, 0.4634375, 0.4634375, 0.4634375, 0.495, 0.495, 0.495, 0.495, 0.495, 0.495, 0.495, 0.495, 0.495, 0.495, 0.495, 0.495, 0.495, 0.5265625, 0.5265625, 0.5265625, 0.5265625, 0.5265625, 0.5265625, 0.5265625, 0.5265625, 0.5265625, 0.5265625, 0.5265625, 0.5265625, 0.5265625, 0.558125, 0.558125, 0.558125, 0.558125, 0.558125, 0.558125, 0.558125, 0.558125, 0.558125, 0.558125, 0.558125, 0.558125, 0.558125, 0.5896875, 0.5896875, 0.5896875, 0.5896875, 0.5896875, 0.5896875, 0.5896875, 0.5896875, 0.5896875, 0.5896875, 0.5896875, 0.5896875, 0.5896875, 0.62125, 0.62125, 0.62125, 0.62125, 0.62125, 0.62125, 0.62125, 0.62125, 0.62125, 0.62125, 0.62125, 0.62125, 0.62125, 0.625195313, 0.625195313, 0.625195313, 0.625195313, 0.625195313, 0.625195313, 0.625195313, 0.625195313, 0.625195313, 0.625195313, 0.625195313, 0.625195313, 0.625195313, 0.629140625, 0.629140625, 0.629140625, 0.629140625, 0.629140625, 0.629140625, 0.629140625, 0.629140625, 0.629140625, 0.629140625, 0.629140625, 0.629140625, 0.629140625, 0.63703125, 0.63703125, 0.63703125, 0.63703125, 0.63703125, 0.63703125, 0.63703125, 0.63703125, 0.63703125, 0.63703125, 0.63703125, 0.63703125, 0.63703125, 0.6528125, 0.6528125, 0.6528125, 0.6528125, 0.6528125, 0.6528125, 0.6528125, 0.6528125, 0.6528125, 0.6528125, 0.6528125, 0.6528125, 0.6528125, 0.684375, 0.684375, 0.684375, 0.684375, 0.684375, 0.684375, 0.684375, 0.684375, 0.684375, 0.684375, 0.684375, 0.684375, 0.684375, 0.7159375, 0.7159375, 0.7159375, 0.7159375, 0.7159375, 0.7159375, 0.7159375, 0.7159375, 0.7159375, 0.7159375, 0.7159375, 0.7159375, 0.7159375, 0.7475, 0.7475, 0.7475, 0.7475, 0.7475, 0.7475, 0.7475, 0.7475, 0.7475, 0.7475, 0.7475, 0.7475, 0.7475, 0.76328125, 0.76328125, 0.76328125, 0.76328125, 0.76328125, 0.76328125, 0.76328125, 0.76328125, 0.76328125, 0.76328125, 0.76328125, 0.76328125, 0.76328125, 0.7790625, 0.7790625, 0.7790625, 0.7790625, 0.7790625, 0.7790625, 0.7790625, 0.7790625, 0.7790625, 0.7790625, 0.7790625, 0.7790625, 0.7790625, 0.810625, 0.810625, 0.810625, 0.810625, 0.810625, 0.810625, 0.810625, 0.810625, 0.810625, 0.810625, 0.810625, 0.810625, 0.810625, 0.82640625, 0.82640625, 0.82640625, 0.82640625, 0.82640625, 0.82640625, 0.82640625, 0.82640625, 0.82640625, 0.82640625, 0.82640625, 0.82640625, 0.82640625, 0.8421875, 0.8421875, 0.8421875, 0.8421875, 0.8421875, 0.8421875, 0.8421875, 0.8421875, 0.8421875, 0.8421875, 0.8421875, 0.8421875, 0.8421875, 0.87375, 0.87375, 0.87375, 0.87375, 0.87375, 0.87375, 0.87375, 0.87375, 0.87375, 0.87375, 0.87375, 0.87375, 0.87375, 0.9053125, 0.9053125, 0.9053125, 0.9053125, 0.9053125, 0.9053125, 0.9053125, 0.9053125, 0.9053125, 0.9053125, 0.9053125, 0.9053125, 0.9053125, 0.936875, 0.936875, 0.936875, 0.936875, 0.936875, 0.936875, 0.936875, 0.936875, 0.936875, 0.936875, 0.936875, 0.936875, 0.936875, 1, 1, 1, 1, 1, 1, 1, 1, 1, 1, 1, 1, 1, 1, 1], degree=14))
            ThreePointArc((-6.379554183, 0.619822851), (-6.578477057, -1.52319194), (-8.441487365, -2.600816779))
        make_face()
        with BuildLine():
            add(Edge.make_bspline(
                [(-26.3254835, -3.667013126), (-25.88501641, -5.291831431), (-25.29377098, -6.855009859), (-23.845193985, -9.80629411), (-22.98792657, -11.194349378), (-21.051401006, -13.752352434), (-19.972214517, -14.922264044), (-17.642414844, -17.011136269), (-16.391877744, -17.930076055), (-13.774181132, -19.49521083), (-12.407098951, -20.141400668), (-9.613043017, -21.150681858), (-8.186144708, -21.513783431), (-5.328810088, -21.957896657), (-3.898444365, -22.038932986), (-1.087949282, -21.930758945), (0.292117033, -21.741586229), (2.952832896, -21.114730733), (4.233429246, -20.677096627), (6.652371052, -19.583645356), (7.790674993, -18.927885533), (9.889971566, -17.435500393), (10.850935673, -16.598938448), (12.56932106, -14.787435905), (13.326727542, -13.812561896), (14.621247223, -11.770130786), (15.158359498, -10.70264063), (16.00525724, -8.521867273), (16.315055224, -7.408648574), (16.709831654, -5.182520117), (16.79483508, -4.069669804), (16.751503646, -1.887722789), (16.623204755, -0.818678144), (16.172803424, 1.236551533), (15.85074605, 2.22269385), (15.039192621, 4.078780417), (14.549748502, 4.948692799), (13.435152517, 6.545872807), (12.810057002, 7.273120414), (11.459621106, 8.566197708), (10.73433891, 9.132019695), (8.46432492, 10.571334953), (6.826310345, 11.182779689), (3.596803483, 11.720427957), (2.006859472, 11.647480976), (-0.874358563, 10.942499326), (-2.164612563, 10.311829803), (-4.281093265, 8.698405735), (-5.106975392, 7.717261628), (-6.237076936, 5.644996058), (-6.54165034, 4.555429578), (-6.679047096, 2.494871997), (-6.512822326, 1.525102008), (-6.179406175, 0.700777066)],
                knots=[0, 0, 0, 0, 0.03125, 0.03125, 0.0625, 0.0625, 0.09375, 0.09375, 0.125, 0.125, 0.15625, 0.15625, 0.1875, 0.1875, 0.21875, 0.21875, 0.25, 0.25, 0.28125, 0.28125, 0.3125, 0.3125, 0.34375, 0.34375, 0.375, 0.375, 0.40625, 0.40625, 0.4375, 0.4375, 0.46875, 0.46875, 0.5, 0.5, 0.53125, 0.53125, 0.5625, 0.5625, 0.59375, 0.59375, 0.625, 0.625, 0.6875, 0.6875, 0.75, 0.75, 0.8125, 0.8125, 0.875, 0.875, 0.9375, 0.9375, 1, 1, 1, 1], degree=3))
            Line((-26.3254835, -3.667013126), (-8.431236894, -2.816473307))
            ThreePointArc((-8.431236894, -2.816473307), (-6.396649217, -1.639602622), (-6.179406175, 0.700777066))
        make_face(mode=Mode.SUBTRACT)
    extrude(amount=MOVE_FACE1_DEPTH)

    # Sketch11 → Cut-Extrude2 (cut, through all)
    with BuildSketch(Plane.ZY):
        with Locations((-6.553216354, -4.588611491)):
            Circle(SKETCH11_R)
        with Locations((-4.588611491, 6.553216354)):
            Circle(SKETCH11_R)
        with Locations((6.553216354, 4.588611491)):
            Circle(SKETCH11_R)
    extrude(amount=-CUT_EXTRUDE2_DEPTH, mode=Mode.SUBTRACT)


solid = part.part
